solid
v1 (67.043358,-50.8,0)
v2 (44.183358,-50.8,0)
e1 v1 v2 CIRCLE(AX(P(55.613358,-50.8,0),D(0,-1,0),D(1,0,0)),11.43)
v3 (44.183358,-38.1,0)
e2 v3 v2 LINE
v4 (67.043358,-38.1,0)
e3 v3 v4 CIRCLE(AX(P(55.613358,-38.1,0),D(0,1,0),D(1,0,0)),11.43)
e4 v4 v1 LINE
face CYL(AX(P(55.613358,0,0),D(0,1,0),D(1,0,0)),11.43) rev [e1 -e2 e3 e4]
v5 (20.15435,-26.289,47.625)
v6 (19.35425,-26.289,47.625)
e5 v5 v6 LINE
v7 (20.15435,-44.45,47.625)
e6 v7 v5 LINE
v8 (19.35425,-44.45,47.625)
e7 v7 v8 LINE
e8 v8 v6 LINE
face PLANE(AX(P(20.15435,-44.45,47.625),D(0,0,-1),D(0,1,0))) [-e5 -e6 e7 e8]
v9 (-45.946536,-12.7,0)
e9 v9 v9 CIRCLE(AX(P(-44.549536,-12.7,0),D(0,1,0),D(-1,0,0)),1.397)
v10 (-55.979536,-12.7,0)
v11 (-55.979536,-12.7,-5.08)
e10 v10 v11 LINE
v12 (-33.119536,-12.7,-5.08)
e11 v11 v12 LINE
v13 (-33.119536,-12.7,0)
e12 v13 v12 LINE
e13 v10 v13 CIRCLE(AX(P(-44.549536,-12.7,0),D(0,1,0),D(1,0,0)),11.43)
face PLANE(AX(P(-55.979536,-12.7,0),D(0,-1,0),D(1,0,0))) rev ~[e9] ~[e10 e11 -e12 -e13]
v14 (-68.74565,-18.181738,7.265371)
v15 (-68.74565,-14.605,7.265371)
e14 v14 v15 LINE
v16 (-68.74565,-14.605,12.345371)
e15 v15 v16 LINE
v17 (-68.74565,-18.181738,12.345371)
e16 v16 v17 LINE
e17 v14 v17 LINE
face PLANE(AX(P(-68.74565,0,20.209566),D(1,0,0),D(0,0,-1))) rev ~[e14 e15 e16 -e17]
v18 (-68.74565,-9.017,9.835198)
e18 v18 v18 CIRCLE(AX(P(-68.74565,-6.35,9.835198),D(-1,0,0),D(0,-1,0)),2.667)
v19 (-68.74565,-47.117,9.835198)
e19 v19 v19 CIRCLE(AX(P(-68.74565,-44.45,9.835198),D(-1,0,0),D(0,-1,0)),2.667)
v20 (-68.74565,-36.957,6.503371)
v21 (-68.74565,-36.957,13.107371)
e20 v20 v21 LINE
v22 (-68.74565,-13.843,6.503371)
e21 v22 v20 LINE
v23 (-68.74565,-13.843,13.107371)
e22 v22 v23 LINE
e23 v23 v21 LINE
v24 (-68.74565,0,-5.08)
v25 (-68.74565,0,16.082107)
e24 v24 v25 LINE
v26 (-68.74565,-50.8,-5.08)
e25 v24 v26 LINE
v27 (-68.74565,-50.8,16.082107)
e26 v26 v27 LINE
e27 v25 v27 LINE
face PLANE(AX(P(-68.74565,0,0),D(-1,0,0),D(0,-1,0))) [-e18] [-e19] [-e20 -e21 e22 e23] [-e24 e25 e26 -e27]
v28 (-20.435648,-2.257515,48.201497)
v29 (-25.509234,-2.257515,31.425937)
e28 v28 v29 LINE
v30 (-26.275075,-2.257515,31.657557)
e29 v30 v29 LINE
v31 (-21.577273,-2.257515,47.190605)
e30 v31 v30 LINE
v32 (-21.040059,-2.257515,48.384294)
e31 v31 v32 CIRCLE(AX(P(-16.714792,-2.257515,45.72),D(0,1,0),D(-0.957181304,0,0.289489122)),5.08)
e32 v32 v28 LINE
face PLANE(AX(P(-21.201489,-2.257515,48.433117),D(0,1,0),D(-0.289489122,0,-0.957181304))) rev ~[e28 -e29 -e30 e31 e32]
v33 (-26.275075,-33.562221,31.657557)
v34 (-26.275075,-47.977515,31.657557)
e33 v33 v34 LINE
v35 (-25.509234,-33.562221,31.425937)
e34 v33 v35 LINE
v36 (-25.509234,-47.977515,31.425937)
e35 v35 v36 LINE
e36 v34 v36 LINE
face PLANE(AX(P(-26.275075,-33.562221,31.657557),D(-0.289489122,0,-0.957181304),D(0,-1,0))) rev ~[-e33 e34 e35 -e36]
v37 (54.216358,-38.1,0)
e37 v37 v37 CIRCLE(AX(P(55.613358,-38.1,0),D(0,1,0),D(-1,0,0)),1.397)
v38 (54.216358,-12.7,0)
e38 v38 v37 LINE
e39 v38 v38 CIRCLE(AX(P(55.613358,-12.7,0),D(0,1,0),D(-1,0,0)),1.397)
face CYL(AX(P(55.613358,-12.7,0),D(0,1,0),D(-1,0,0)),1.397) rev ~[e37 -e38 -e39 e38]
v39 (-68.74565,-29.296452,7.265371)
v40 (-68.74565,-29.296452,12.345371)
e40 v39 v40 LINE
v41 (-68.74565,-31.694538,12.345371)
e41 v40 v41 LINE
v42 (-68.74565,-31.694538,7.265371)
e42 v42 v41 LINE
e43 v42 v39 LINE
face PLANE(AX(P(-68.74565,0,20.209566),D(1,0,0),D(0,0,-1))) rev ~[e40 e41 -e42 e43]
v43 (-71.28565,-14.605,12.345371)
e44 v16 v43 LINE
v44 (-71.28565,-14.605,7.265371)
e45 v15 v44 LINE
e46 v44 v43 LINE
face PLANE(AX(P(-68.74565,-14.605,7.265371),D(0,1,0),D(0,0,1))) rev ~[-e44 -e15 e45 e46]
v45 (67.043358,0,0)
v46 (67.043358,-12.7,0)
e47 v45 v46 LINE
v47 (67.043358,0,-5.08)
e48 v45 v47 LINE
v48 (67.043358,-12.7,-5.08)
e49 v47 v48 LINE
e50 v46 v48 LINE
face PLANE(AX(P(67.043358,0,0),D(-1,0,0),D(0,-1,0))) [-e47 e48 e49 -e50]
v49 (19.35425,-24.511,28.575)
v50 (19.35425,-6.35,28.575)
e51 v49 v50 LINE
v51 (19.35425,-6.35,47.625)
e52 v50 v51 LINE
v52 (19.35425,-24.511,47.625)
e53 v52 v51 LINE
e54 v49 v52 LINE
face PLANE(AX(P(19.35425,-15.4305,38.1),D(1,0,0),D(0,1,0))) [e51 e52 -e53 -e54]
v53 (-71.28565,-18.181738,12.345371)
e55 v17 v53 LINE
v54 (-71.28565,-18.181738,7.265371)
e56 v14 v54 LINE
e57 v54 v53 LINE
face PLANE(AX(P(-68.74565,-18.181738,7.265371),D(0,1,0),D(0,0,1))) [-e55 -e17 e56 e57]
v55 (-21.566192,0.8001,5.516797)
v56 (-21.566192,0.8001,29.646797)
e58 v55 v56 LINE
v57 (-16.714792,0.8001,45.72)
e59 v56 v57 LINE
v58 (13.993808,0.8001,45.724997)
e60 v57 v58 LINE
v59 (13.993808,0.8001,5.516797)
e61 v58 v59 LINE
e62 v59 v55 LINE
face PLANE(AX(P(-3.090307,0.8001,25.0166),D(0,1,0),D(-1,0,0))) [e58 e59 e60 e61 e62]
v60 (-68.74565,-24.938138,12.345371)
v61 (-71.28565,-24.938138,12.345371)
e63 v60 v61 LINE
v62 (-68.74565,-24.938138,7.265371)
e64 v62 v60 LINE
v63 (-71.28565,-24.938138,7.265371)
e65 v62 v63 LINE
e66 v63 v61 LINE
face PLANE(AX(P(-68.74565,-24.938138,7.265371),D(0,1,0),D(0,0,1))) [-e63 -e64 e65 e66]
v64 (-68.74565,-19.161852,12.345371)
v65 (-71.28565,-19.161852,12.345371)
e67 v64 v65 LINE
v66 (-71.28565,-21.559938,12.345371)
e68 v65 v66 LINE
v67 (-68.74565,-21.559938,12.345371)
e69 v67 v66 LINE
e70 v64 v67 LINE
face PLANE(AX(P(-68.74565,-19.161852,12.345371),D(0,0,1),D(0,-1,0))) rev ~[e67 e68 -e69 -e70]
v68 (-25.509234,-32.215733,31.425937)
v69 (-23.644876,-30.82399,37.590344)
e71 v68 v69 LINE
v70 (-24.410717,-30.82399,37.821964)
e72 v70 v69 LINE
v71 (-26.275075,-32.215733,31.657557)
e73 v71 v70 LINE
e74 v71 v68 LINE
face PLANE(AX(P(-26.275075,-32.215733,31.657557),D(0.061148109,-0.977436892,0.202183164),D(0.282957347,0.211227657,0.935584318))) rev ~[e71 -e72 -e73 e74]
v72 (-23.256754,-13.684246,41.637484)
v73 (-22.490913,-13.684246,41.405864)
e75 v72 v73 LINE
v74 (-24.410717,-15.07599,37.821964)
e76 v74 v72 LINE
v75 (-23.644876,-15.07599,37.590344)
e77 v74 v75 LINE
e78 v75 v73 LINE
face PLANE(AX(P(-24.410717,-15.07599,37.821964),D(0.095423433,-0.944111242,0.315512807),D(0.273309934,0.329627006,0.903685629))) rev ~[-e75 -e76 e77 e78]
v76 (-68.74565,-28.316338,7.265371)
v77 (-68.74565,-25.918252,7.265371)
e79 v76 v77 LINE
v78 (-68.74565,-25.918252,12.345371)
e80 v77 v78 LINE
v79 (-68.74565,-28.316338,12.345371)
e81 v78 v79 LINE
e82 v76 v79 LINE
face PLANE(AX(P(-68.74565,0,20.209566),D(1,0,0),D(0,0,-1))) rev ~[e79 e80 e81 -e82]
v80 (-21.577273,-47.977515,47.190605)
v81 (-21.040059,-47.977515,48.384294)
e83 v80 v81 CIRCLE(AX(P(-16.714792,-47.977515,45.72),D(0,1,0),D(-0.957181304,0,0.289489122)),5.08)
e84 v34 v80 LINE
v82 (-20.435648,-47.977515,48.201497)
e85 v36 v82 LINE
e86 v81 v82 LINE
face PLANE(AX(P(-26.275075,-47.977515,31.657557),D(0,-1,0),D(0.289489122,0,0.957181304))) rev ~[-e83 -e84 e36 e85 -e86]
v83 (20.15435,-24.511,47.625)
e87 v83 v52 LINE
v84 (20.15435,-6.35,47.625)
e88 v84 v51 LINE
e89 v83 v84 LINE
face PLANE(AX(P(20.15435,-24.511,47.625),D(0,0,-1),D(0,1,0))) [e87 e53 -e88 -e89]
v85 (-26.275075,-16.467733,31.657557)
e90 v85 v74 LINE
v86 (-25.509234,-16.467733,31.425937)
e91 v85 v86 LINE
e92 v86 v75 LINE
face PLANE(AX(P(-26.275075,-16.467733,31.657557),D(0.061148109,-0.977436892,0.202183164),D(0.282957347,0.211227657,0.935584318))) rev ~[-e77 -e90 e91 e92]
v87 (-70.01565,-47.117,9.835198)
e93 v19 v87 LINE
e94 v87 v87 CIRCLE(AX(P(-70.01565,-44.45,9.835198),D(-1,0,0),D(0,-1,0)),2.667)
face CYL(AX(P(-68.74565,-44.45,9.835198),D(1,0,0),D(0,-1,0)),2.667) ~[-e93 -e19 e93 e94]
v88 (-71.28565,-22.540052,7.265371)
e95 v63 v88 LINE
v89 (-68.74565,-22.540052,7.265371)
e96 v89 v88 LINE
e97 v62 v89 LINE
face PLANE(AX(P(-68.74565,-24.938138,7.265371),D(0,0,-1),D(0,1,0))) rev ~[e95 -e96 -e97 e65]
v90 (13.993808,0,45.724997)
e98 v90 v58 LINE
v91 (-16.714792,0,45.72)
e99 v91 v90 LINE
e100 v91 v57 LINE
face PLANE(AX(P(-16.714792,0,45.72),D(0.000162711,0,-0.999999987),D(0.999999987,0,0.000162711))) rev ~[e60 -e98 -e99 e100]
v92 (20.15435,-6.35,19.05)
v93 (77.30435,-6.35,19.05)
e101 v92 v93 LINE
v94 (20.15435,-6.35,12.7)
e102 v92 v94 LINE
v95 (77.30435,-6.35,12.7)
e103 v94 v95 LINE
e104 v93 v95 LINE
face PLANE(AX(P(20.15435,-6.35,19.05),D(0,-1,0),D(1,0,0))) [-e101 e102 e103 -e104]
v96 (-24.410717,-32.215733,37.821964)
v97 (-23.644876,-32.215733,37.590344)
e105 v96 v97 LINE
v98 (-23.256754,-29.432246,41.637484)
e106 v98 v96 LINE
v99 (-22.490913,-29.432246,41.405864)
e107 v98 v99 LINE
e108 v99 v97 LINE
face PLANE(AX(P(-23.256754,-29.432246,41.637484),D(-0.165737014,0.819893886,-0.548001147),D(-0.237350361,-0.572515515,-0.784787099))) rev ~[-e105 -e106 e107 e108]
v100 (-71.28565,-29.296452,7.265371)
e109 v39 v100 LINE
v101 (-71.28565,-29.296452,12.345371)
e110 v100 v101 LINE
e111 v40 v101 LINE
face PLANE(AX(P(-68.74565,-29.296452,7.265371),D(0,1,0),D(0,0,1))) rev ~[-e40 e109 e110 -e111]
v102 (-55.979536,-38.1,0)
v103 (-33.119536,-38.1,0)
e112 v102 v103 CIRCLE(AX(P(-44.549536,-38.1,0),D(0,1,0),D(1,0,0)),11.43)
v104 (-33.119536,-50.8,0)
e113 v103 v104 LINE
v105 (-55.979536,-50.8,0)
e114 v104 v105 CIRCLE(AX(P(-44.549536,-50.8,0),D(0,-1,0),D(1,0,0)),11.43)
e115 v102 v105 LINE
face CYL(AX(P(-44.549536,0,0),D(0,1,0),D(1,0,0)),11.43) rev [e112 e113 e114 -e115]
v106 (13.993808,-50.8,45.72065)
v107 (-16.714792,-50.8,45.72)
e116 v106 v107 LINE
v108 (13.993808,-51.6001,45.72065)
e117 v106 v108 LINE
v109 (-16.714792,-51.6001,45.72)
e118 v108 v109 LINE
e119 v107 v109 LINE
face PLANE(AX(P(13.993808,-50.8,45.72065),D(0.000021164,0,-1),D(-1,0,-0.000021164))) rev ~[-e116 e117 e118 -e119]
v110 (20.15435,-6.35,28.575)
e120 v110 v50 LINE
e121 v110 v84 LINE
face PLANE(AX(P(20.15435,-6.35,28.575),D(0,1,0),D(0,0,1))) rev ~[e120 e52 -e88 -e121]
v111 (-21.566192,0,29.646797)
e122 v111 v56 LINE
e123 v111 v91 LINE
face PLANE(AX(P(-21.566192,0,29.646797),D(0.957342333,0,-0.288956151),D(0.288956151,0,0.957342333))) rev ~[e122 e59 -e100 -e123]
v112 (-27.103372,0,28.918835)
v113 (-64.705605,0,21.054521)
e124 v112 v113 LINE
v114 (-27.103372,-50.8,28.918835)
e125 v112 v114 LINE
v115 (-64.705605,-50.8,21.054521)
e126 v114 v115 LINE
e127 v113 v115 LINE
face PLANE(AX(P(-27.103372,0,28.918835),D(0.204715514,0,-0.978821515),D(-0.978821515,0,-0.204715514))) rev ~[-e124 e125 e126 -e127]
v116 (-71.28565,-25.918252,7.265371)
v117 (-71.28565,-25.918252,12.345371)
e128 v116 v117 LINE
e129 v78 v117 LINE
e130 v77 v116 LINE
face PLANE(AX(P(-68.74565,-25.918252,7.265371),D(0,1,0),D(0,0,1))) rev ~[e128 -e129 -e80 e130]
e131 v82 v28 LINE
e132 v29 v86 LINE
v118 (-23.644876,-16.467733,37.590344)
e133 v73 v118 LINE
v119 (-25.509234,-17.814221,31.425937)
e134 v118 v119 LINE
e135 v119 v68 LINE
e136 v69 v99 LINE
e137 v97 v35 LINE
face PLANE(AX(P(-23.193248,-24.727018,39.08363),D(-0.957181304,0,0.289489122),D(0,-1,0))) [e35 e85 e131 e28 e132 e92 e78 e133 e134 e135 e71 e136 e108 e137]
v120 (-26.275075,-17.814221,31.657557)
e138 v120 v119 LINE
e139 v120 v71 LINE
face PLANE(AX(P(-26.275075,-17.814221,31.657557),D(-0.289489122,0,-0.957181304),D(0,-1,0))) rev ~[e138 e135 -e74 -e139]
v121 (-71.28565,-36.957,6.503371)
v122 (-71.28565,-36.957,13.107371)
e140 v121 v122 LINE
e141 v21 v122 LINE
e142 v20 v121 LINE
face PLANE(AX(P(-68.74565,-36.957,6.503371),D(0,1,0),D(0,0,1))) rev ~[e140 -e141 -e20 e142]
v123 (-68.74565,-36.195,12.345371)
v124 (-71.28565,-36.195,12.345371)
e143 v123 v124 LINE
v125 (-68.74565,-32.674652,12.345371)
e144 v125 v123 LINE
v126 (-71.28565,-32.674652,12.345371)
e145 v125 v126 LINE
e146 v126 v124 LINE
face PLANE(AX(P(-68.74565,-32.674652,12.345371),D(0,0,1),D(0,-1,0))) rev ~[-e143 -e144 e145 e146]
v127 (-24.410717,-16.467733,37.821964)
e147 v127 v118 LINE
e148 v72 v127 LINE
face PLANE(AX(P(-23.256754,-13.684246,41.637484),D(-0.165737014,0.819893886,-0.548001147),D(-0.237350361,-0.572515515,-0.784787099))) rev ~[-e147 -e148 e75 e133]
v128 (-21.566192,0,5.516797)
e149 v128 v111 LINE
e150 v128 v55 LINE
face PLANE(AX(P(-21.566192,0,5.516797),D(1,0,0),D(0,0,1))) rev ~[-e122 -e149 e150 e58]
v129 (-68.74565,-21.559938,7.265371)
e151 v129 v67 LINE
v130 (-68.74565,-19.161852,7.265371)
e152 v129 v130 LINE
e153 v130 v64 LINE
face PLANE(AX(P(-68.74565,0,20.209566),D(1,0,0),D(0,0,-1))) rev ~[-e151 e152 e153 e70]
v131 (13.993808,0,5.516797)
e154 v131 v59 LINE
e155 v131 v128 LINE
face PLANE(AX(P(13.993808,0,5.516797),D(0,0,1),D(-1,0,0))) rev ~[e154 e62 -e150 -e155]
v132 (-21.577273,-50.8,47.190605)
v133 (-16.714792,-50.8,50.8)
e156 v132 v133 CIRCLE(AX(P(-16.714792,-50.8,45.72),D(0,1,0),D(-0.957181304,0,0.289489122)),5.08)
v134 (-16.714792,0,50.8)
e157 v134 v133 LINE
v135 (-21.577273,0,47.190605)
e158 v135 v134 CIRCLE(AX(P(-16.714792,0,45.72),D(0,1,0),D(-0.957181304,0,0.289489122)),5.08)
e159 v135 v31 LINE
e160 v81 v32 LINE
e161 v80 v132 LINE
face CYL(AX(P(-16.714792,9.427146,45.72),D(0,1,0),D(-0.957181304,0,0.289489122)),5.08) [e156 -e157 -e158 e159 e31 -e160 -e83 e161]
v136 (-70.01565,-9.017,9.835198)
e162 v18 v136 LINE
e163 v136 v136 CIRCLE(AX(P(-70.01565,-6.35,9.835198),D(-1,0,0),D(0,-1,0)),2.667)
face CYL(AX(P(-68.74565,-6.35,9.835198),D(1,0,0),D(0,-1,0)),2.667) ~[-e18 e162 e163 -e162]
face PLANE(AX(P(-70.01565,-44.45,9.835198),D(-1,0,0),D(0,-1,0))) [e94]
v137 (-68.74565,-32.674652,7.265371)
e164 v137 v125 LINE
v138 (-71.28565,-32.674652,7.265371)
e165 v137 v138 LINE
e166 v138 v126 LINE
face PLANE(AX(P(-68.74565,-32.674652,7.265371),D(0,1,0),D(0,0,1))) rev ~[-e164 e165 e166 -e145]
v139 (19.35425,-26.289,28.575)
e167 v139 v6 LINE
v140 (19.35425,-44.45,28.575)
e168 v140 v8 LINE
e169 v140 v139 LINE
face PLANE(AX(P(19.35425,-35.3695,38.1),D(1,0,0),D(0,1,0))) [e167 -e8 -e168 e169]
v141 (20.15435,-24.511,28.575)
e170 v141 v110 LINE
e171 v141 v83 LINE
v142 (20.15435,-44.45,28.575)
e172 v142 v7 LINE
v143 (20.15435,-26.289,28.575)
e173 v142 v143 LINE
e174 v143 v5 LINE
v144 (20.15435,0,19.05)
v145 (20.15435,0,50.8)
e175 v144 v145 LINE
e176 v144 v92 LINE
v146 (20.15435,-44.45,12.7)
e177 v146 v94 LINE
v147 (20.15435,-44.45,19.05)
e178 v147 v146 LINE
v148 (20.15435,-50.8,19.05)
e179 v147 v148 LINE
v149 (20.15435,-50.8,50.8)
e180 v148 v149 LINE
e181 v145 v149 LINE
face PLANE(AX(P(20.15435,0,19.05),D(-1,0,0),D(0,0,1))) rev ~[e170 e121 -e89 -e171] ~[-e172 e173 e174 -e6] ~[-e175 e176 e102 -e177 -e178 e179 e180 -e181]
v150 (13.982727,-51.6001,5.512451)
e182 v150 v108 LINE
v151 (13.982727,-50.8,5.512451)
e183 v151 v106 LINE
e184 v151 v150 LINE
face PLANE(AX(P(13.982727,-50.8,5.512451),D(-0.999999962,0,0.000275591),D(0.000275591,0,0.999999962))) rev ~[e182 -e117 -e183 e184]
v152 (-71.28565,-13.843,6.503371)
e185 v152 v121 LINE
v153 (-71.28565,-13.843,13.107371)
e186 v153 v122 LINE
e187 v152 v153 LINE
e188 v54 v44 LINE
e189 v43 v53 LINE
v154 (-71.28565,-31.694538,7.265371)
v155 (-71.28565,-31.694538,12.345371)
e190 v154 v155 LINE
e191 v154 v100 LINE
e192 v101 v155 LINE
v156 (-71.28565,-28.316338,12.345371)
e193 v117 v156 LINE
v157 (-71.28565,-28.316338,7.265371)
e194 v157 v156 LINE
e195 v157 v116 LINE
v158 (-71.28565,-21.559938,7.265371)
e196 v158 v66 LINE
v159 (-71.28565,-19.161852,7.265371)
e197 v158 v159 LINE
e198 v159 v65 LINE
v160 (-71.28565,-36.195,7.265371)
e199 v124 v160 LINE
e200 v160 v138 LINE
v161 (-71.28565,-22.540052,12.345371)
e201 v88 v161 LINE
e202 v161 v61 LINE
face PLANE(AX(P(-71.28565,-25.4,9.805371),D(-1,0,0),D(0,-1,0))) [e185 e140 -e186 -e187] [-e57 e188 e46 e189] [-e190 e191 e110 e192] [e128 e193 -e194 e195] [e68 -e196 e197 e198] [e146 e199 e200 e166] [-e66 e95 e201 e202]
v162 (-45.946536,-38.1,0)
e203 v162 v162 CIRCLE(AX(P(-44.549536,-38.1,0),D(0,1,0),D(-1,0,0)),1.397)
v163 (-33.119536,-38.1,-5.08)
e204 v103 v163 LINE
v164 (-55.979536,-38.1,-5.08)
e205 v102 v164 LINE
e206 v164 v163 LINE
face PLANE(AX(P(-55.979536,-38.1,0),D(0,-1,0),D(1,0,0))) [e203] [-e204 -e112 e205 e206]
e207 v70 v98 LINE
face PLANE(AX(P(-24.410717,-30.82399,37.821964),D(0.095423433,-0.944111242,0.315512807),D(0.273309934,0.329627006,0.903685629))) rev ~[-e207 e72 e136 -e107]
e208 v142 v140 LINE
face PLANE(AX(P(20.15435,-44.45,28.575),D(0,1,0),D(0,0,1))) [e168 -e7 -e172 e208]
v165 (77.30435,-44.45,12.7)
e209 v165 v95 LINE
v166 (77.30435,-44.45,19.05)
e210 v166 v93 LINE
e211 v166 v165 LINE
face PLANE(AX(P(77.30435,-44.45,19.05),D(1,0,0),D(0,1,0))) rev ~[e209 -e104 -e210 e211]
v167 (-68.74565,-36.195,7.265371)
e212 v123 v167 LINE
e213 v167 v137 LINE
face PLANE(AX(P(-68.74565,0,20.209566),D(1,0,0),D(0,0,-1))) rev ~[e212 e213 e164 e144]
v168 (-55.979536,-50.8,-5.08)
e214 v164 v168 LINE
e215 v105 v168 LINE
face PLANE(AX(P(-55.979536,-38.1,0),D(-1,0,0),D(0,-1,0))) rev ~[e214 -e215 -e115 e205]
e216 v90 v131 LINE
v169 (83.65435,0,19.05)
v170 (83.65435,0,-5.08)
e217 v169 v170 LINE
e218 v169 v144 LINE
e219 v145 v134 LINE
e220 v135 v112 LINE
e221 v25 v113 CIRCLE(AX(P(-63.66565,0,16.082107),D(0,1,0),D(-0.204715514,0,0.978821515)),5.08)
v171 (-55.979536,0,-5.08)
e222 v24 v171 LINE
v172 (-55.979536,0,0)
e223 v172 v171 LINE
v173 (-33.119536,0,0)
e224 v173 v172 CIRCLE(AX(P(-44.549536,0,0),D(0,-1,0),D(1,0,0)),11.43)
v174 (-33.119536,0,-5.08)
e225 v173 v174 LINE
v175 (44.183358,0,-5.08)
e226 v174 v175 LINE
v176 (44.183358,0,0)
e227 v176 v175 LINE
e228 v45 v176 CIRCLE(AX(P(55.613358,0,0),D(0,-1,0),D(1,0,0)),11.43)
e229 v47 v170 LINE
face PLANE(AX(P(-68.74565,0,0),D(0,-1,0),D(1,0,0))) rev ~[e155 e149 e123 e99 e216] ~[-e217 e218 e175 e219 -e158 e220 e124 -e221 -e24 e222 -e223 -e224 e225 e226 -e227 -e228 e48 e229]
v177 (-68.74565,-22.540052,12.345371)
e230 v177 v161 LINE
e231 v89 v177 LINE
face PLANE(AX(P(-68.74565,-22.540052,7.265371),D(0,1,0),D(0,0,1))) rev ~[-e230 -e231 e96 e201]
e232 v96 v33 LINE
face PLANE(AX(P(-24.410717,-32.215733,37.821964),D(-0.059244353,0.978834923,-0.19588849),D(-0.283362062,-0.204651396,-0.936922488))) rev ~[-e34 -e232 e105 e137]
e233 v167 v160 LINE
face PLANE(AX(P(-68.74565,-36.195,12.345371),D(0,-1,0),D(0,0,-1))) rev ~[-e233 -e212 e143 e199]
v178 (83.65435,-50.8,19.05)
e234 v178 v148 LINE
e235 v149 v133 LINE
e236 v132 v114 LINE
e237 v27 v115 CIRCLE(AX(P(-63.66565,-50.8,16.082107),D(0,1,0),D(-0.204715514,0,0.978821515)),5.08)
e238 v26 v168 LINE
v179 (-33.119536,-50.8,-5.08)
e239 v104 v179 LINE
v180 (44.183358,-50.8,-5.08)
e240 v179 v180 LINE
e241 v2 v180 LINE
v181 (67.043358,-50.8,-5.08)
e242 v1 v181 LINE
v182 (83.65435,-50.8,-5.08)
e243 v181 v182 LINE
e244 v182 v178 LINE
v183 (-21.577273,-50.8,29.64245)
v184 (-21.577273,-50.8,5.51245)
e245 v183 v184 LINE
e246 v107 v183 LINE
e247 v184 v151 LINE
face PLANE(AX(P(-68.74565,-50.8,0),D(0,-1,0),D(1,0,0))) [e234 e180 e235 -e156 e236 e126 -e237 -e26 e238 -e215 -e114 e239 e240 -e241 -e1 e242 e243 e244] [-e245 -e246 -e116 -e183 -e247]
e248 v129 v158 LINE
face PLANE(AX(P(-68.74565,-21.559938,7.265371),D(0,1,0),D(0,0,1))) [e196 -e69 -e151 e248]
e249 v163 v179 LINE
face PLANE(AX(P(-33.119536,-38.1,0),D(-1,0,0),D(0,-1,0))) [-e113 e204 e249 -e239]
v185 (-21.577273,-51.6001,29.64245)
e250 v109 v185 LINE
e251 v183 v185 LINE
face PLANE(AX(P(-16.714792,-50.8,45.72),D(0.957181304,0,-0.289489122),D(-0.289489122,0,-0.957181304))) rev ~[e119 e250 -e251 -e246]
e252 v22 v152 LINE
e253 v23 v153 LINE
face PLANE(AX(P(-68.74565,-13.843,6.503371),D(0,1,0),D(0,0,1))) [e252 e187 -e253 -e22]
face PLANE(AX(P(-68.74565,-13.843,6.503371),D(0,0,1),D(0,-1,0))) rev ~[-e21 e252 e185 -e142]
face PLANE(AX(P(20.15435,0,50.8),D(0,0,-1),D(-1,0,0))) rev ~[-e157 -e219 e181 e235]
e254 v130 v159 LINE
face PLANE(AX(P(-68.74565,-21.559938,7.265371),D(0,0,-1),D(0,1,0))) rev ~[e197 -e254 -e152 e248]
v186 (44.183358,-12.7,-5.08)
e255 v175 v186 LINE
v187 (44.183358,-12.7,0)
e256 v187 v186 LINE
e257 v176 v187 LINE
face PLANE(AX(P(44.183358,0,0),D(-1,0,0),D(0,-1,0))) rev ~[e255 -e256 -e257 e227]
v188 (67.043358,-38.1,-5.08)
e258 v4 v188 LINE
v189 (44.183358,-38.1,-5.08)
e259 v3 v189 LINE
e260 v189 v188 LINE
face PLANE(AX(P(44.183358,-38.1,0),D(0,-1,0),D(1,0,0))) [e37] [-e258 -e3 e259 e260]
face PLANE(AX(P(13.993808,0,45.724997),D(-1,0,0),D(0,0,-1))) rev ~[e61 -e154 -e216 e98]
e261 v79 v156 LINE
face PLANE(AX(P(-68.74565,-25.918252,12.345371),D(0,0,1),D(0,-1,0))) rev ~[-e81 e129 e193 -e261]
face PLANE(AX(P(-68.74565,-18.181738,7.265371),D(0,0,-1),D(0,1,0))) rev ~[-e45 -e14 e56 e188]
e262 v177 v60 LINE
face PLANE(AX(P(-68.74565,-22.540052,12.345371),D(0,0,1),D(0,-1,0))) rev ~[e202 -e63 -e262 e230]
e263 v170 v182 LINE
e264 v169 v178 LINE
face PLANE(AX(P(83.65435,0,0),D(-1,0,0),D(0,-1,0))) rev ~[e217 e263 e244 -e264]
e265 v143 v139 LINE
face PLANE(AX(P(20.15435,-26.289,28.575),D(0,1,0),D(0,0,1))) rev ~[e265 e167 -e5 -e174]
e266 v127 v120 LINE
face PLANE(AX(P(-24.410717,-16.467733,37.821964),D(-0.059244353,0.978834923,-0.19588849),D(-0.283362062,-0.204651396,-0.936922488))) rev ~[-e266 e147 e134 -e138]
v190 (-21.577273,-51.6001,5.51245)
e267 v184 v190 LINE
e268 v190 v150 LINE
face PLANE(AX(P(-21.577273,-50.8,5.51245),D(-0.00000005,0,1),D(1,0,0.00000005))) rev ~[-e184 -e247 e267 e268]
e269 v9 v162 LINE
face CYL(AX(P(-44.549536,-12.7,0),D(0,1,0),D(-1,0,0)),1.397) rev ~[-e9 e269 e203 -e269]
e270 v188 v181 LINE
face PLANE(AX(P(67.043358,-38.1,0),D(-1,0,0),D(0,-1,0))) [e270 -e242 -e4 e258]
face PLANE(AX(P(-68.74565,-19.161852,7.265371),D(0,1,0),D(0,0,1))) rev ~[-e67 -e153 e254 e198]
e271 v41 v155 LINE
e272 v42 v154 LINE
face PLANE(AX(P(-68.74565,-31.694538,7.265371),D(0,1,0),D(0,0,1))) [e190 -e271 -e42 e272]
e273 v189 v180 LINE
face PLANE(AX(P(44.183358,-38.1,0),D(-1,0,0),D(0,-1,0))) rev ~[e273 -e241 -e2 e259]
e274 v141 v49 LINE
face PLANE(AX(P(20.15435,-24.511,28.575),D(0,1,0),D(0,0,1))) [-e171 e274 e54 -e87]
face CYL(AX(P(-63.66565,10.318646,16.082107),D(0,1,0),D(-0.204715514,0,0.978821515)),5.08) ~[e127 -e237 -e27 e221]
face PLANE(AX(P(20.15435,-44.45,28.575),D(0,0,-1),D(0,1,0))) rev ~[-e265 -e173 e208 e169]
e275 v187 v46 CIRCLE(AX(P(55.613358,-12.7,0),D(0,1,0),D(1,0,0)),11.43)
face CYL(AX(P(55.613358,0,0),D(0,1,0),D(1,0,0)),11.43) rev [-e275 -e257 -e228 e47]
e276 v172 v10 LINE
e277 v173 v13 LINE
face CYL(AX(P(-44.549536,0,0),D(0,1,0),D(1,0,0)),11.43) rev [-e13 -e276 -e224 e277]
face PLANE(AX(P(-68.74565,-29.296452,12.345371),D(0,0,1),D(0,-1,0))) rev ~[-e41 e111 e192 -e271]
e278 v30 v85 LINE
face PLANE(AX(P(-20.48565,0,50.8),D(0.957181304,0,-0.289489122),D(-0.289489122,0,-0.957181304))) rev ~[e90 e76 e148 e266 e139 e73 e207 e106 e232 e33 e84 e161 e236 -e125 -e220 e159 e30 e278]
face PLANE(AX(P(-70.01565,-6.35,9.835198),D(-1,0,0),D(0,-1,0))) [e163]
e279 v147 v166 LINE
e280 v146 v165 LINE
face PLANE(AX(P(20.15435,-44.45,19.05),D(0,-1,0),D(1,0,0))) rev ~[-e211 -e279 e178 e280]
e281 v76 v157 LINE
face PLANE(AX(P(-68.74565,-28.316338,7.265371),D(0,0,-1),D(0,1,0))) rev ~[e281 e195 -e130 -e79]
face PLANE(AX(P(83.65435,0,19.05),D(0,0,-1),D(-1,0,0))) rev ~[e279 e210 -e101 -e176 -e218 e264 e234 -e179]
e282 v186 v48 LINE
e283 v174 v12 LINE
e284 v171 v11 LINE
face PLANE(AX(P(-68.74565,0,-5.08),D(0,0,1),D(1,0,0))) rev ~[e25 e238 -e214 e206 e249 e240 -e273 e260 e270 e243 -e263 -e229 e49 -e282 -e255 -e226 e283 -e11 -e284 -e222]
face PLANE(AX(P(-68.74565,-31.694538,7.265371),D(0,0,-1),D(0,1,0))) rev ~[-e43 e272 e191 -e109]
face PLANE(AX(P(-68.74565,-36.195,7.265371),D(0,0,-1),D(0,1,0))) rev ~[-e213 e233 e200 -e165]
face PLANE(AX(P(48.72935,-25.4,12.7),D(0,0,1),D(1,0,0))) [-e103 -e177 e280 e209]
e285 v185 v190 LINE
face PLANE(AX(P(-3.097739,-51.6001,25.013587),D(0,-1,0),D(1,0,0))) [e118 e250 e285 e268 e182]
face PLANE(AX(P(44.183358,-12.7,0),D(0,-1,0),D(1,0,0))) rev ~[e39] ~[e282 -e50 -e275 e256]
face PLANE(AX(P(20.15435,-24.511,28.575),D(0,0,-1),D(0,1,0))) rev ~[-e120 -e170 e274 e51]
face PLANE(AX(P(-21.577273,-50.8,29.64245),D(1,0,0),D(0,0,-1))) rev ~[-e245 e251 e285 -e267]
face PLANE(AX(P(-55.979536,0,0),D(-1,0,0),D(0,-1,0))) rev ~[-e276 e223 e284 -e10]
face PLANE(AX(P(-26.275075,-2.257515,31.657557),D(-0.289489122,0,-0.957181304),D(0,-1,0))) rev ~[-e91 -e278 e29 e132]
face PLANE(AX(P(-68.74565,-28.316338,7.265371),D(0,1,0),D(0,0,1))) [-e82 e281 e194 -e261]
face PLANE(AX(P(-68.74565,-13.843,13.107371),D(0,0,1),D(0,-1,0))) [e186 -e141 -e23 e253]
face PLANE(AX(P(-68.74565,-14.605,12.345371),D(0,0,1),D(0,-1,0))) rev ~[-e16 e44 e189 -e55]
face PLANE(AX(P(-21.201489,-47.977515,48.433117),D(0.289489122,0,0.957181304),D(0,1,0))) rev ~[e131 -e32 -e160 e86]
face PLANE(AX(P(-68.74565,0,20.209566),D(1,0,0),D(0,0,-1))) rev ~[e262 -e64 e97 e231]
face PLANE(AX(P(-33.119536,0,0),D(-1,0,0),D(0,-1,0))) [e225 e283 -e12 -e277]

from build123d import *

# Parameters (mm, degrees)
F1_DEPTH    = 50.8
F2_W        = 57.15
F2_H        = 38.1
F3_DEPTH    = 6.35
F4_W        = 23.114
F4_H        = 6.604
F4_W_2      = 0.9801145643
F4_H_2      = 5.08
F5_DEPTH    = 2.54
F4_R        = 2.667
F6_DEPTH    = 1.27
F8_DEPTH    = 0.8001
F9_T1_DEPTH = 71.4372925246
F9_T3_DEPTH = 69.6542925277
F11_DEPTH   = 0.8001
F13_DEPTH   = 0.8001
F15_DEPTH   = 0.254
F16_W       = 18.161
F16_H       = 19.05
F17_DEPTH   = 0.8001
F18_DEPTH   = 50.8
F19_W       = 127
F19_H       = 25.4
F20_DEPTH   = 12.7
F21_DEPTH   = 5.08
F22_R       = 1.397
F23_R       = 1.397
F24_DEPTH   = 25.4


# Not quite as in the source:
# - a fillet or chamfer that OpenCascade refuses, or shapes differently, is made with other operations: its cross-section is extruded or revolved along the edge and cut away or added


with BuildPart() as f1:
    # F0 (on Front) → F1 (new body)
    with BuildSketch(Plane.XZ):
        with BuildLine():
            Line((-68.745650351, 20.2095657587), (-68.745650351, 0))
            Line((-68.745650351, 0), (-55.97953596, 0))
            ThreePointArc((-55.97953596, 0), (-44.54953596, 11.43), (-33.11953596, 0))
            Line((-33.11953596, 0), (44.1833575737, 0))
            ThreePointArc((44.1833575737, 0), (55.6133575737, 11.43), (67.0433575737, 0))
            Line((67.0433575737, 0), (83.654349649, 0))
            Line((83.654349649, 0), (83.654349649, 19.05))
            Line((83.654349649, 19.05), (20.154349649, 19.05))
            Line((20.154349649, 19.05), (20.154349649, 50.8))
            Line((20.154349649, 50.8), (-20.485650351, 50.8))
            Line((-20.485650351, 50.8), (-27.103371678, 28.9188353957))
            Line((-27.103371678, 28.9188353957), (-68.745650351, 20.2095657587))
        make_face()
        with BuildLine():
            ThreePointArc((-33.11953596, 0), (-44.54953596, 11.43), (-55.97953596, 0))
            Line((-55.97953596, 0), (-33.11953596, 0))
        make_face()
        with BuildLine():
            ThreePointArc((67.0433575737, 0), (55.6133575737, 11.43), (44.1833575737, 0))
            Line((44.1833575737, 0), (67.0433575737, 0))
        make_face()
    extrude(amount=F1_DEPTH)

    # F2 (on face) → F3 (cut)
    with BuildSketch(Plane.XY.offset(19.05)):
        with Locations((48.729349649, -25.4)):
            Rectangle(F2_W, F2_H)
    extrude(amount=-F3_DEPTH, mode=Mode.SUBTRACT)

    # F4 (on face) → F5 (join)
    with BuildSketch(Plane(origin=(-68.745650351, 0, 0), x_dir=(0, -1, 0), z_dir=(-1, 0, 0))):
        with Locations((25.4, 9.8053713022)):
            Rectangle(F4_W, F4_H)
        Polygon((36.195, 12.3453713022), (36.195, 7.2653713022), (32.6746520766, 7.2653713022), (31.6945375124, 7.2653713022), (29.2964520766, 7.2653713022), (28.3163375124, 7.2653713022), (25.9182520766, 7.2653713022), (24.9381375124, 7.2653713022), (22.5400520766, 7.2653713022), (21.5599375124, 7.2653713022), (19.1618520766, 7.2653713022), (18.1817375124, 7.2653713022), (14.605, 7.2653713022), (14.605, 12.3453713022), (18.1817375124, 12.3453713022), (19.1618520766, 12.3453713022), (21.5599375124, 12.3453713022), (22.5400520766, 12.3453713022), (24.9381375124, 12.3453713022), (25.9182520766, 12.3453713022), (28.3163375124, 12.3453713022), (29.2964520766, 12.3453713022), (31.6945375124, 12.3453713022), (32.6746520766, 12.3453713022), align=None, mode=Mode.SUBTRACT)
        with Locations((18.6717947945, 9.8053713022)):
            Rectangle(F4_W_2, F4_H_2)
        with Locations((22.0499947945, 9.8053713022)):
            Rectangle(F4_W_2, F4_H_2)
        with Locations((25.4281947945, 9.8053713022)):
            Rectangle(F4_W_2, F4_H_2)
        with Locations((28.8063947945, 9.8053713022)):
            Rectangle(F4_W_2, F4_H_2)
        with Locations((32.1845947945, 9.8053713022)):
            Rectangle(F4_W_2, F4_H_2)
    extrude(amount=F5_DEPTH)

    # F4 (on face) → F6 (join)
    with BuildSketch(Plane(origin=(-68.745650351, 0, 0), x_dir=(0, -1, 0), z_dir=(-1, 0, 0))):
        with Locations((6.35, 9.8351975903)):
            Circle(F4_R)
        with Locations((44.45, 9.8351975903)):
            Circle(F4_R)
    extrude(amount=F6_DEPTH)

    # F7 (on face) → F8 (cut)
    with BuildSketch(Plane(origin=(-32.8452255156, 0, 9.9336828416), x_dir=(0, -1, 0), z_dir=(-0.9571813038, 0, 0.2894891219))):
        Polygon((33.562220633, 22.6956736296), (47.9775152107, 22.6956736296), (47.9775152107, 40.2216736296), (2.2575152107, 40.2216736296), (2.2575152107, 22.6956736296), (16.4677330811, 22.6956736296), (15.0759897713, 29.1358400136), (13.6842464615, 33.1220440567), (16.4677330811, 29.1358400136), (17.814220633, 22.6956736296), (32.2157330811, 22.6956736296), (30.8239897713, 29.1358400136), (29.4322464615, 33.1220440567), (32.2157330811, 29.1358400136), align=None)
    extrude(amount=-F8_DEPTH, mode=Mode.SUBTRACT)

    # F9: fillet of radius 5.08 on 2 edges, made by hand

    # F9_s2 → F9_t1 (cut)
    with BuildSketch(Plane.XZ.offset(-10.3186462623)):
        with BuildLine():
            ThreePointArc((-64.7056051643, 21.0545205498), (-67.6083252331, 19.2854983904), (-68.745650351, 16.0821072538))
            Line((-68.745650351, 16.0821072538), (-68.745650351, 20.2095657587))
            Line((-68.745650351, 20.2095657587), (-64.7056051643, 21.0545205498))
        make_face()
    extrude(amount=F9_T1_DEPTH, mode=Mode.SUBTRACT)

    # F9_s4 → F9_t3 (cut)
    with BuildSketch(Plane.XZ.offset(-9.4271462638)):
        with BuildLine():
            ThreePointArc((-21.5772728687, 47.1906047393), (-19.74263992, 49.7990361653), (-16.7147918455, 50.8))
            Line((-16.7147918455, 50.8), (-20.485650351, 50.8))
            Line((-20.485650351, 50.8), (-21.5772728687, 47.1906047393))
        make_face()
    extrude(amount=F9_T3_DEPTH, mode=Mode.SUBTRACT)

    # F10 (on face) → F11 (join)
    with BuildSketch(Plane.XZ.offset(50.8)):
        Polygon((13.9938081476, 45.7206499122), (-16.7147918455, 45.72), (-21.5772728687, 29.6424496777), (-21.5772728687, 5.5124496777), (13.9827271313, 5.5124514391), align=None)
    extrude(amount=F11_DEPTH)

    # F12 (on face) → F13 (join)
    with BuildSketch(Plane(origin=(0, 0, 0), x_dir=(-1, 0, 0), z_dir=(0, 1, 0))):
        Polygon((21.566192252, 29.6467966337), (16.7147918455, 45.72), (-13.993807748, 45.7249966337), (-13.993807748, 5.5167966337), (21.566192252, 5.5167966337), align=None)
    extrude(amount=F13_DEPTH)

    # F14 (on face) → F15 (join)
    with BuildSketch(Plane(origin=(0, 0.8001, 0), x_dir=(-1, 0, 0), z_dir=(0, 1, 0))):
        Polygon((-11.5635488182, 29.6467966337), (18.8161898404, 29.6467966337), (14.9059221148, 43.1567057967), (-11.5635488182, 43.1567057967), align=None)
    extrude(amount=-F15_DEPTH)

    # F16 (on face) → F17 (cut)
    with BuildSketch(Plane.YZ.offset(20.154349649)):
        with Locations((-35.3695, 38.1)):
            Rectangle(F16_W, F16_H)
        with Locations((-15.4305, 38.1)):
            Rectangle(F16_W, F16_H)
    extrude(amount=-F17_DEPTH, mode=Mode.SUBTRACT)

    # F0 (on Front) → F18 (cut)
    with BuildSketch(Plane.XZ):
        with BuildLine():
            ThreePointArc((67.0433575737, 0), (55.6133575737, 11.43), (44.1833575737, 0))
            Line((44.1833575737, 0), (67.0433575737, 0))
        make_face()
        with BuildLine():
            ThreePointArc((-33.11953596, 0), (-44.54953596, 11.43), (-55.97953596, 0))
            Line((-55.97953596, 0), (-33.11953596, 0))
        make_face()
    extrude(amount=F18_DEPTH, mode=Mode.SUBTRACT)

    # F19 (on face) → F20 (join)
    with BuildSketch(Plane(origin=(0, 0, 0), x_dir=(1, 0, 0), z_dir=(0, 0, -1))):
        with Locations((6.3173042834, 25.4)):
            Rectangle(F19_W, F19_H)
    extrude(amount=-F20_DEPTH)

    # F21 (add): a face of the model
    f21_faces = [f1.faces().sort_by_distance(p)[0] for p in [
        (7.7936035623, -25.4, 0),
    ]]
    extrude(f21_faces, amount=F21_DEPTH)

    # F22 (on face) + F23 (on face) → F24 (cut)
    with BuildSketch(Plane(origin=(0, -12.7, 0), x_dir=(-1, 0, 0), z_dir=(0, 1, 0))):
        with Locations((-55.6133575737, 0)):
            Circle(F22_R)
    with BuildSketch(Plane(origin=(0, -12.7, 0), x_dir=(-1, 0, 0), z_dir=(0, 1, 0))):
        with Locations((44.54953596, 0)):
            Circle(F23_R)
    extrude(amount=-F24_DEPTH, mode=Mode.SUBTRACT)


solid = f1.part
